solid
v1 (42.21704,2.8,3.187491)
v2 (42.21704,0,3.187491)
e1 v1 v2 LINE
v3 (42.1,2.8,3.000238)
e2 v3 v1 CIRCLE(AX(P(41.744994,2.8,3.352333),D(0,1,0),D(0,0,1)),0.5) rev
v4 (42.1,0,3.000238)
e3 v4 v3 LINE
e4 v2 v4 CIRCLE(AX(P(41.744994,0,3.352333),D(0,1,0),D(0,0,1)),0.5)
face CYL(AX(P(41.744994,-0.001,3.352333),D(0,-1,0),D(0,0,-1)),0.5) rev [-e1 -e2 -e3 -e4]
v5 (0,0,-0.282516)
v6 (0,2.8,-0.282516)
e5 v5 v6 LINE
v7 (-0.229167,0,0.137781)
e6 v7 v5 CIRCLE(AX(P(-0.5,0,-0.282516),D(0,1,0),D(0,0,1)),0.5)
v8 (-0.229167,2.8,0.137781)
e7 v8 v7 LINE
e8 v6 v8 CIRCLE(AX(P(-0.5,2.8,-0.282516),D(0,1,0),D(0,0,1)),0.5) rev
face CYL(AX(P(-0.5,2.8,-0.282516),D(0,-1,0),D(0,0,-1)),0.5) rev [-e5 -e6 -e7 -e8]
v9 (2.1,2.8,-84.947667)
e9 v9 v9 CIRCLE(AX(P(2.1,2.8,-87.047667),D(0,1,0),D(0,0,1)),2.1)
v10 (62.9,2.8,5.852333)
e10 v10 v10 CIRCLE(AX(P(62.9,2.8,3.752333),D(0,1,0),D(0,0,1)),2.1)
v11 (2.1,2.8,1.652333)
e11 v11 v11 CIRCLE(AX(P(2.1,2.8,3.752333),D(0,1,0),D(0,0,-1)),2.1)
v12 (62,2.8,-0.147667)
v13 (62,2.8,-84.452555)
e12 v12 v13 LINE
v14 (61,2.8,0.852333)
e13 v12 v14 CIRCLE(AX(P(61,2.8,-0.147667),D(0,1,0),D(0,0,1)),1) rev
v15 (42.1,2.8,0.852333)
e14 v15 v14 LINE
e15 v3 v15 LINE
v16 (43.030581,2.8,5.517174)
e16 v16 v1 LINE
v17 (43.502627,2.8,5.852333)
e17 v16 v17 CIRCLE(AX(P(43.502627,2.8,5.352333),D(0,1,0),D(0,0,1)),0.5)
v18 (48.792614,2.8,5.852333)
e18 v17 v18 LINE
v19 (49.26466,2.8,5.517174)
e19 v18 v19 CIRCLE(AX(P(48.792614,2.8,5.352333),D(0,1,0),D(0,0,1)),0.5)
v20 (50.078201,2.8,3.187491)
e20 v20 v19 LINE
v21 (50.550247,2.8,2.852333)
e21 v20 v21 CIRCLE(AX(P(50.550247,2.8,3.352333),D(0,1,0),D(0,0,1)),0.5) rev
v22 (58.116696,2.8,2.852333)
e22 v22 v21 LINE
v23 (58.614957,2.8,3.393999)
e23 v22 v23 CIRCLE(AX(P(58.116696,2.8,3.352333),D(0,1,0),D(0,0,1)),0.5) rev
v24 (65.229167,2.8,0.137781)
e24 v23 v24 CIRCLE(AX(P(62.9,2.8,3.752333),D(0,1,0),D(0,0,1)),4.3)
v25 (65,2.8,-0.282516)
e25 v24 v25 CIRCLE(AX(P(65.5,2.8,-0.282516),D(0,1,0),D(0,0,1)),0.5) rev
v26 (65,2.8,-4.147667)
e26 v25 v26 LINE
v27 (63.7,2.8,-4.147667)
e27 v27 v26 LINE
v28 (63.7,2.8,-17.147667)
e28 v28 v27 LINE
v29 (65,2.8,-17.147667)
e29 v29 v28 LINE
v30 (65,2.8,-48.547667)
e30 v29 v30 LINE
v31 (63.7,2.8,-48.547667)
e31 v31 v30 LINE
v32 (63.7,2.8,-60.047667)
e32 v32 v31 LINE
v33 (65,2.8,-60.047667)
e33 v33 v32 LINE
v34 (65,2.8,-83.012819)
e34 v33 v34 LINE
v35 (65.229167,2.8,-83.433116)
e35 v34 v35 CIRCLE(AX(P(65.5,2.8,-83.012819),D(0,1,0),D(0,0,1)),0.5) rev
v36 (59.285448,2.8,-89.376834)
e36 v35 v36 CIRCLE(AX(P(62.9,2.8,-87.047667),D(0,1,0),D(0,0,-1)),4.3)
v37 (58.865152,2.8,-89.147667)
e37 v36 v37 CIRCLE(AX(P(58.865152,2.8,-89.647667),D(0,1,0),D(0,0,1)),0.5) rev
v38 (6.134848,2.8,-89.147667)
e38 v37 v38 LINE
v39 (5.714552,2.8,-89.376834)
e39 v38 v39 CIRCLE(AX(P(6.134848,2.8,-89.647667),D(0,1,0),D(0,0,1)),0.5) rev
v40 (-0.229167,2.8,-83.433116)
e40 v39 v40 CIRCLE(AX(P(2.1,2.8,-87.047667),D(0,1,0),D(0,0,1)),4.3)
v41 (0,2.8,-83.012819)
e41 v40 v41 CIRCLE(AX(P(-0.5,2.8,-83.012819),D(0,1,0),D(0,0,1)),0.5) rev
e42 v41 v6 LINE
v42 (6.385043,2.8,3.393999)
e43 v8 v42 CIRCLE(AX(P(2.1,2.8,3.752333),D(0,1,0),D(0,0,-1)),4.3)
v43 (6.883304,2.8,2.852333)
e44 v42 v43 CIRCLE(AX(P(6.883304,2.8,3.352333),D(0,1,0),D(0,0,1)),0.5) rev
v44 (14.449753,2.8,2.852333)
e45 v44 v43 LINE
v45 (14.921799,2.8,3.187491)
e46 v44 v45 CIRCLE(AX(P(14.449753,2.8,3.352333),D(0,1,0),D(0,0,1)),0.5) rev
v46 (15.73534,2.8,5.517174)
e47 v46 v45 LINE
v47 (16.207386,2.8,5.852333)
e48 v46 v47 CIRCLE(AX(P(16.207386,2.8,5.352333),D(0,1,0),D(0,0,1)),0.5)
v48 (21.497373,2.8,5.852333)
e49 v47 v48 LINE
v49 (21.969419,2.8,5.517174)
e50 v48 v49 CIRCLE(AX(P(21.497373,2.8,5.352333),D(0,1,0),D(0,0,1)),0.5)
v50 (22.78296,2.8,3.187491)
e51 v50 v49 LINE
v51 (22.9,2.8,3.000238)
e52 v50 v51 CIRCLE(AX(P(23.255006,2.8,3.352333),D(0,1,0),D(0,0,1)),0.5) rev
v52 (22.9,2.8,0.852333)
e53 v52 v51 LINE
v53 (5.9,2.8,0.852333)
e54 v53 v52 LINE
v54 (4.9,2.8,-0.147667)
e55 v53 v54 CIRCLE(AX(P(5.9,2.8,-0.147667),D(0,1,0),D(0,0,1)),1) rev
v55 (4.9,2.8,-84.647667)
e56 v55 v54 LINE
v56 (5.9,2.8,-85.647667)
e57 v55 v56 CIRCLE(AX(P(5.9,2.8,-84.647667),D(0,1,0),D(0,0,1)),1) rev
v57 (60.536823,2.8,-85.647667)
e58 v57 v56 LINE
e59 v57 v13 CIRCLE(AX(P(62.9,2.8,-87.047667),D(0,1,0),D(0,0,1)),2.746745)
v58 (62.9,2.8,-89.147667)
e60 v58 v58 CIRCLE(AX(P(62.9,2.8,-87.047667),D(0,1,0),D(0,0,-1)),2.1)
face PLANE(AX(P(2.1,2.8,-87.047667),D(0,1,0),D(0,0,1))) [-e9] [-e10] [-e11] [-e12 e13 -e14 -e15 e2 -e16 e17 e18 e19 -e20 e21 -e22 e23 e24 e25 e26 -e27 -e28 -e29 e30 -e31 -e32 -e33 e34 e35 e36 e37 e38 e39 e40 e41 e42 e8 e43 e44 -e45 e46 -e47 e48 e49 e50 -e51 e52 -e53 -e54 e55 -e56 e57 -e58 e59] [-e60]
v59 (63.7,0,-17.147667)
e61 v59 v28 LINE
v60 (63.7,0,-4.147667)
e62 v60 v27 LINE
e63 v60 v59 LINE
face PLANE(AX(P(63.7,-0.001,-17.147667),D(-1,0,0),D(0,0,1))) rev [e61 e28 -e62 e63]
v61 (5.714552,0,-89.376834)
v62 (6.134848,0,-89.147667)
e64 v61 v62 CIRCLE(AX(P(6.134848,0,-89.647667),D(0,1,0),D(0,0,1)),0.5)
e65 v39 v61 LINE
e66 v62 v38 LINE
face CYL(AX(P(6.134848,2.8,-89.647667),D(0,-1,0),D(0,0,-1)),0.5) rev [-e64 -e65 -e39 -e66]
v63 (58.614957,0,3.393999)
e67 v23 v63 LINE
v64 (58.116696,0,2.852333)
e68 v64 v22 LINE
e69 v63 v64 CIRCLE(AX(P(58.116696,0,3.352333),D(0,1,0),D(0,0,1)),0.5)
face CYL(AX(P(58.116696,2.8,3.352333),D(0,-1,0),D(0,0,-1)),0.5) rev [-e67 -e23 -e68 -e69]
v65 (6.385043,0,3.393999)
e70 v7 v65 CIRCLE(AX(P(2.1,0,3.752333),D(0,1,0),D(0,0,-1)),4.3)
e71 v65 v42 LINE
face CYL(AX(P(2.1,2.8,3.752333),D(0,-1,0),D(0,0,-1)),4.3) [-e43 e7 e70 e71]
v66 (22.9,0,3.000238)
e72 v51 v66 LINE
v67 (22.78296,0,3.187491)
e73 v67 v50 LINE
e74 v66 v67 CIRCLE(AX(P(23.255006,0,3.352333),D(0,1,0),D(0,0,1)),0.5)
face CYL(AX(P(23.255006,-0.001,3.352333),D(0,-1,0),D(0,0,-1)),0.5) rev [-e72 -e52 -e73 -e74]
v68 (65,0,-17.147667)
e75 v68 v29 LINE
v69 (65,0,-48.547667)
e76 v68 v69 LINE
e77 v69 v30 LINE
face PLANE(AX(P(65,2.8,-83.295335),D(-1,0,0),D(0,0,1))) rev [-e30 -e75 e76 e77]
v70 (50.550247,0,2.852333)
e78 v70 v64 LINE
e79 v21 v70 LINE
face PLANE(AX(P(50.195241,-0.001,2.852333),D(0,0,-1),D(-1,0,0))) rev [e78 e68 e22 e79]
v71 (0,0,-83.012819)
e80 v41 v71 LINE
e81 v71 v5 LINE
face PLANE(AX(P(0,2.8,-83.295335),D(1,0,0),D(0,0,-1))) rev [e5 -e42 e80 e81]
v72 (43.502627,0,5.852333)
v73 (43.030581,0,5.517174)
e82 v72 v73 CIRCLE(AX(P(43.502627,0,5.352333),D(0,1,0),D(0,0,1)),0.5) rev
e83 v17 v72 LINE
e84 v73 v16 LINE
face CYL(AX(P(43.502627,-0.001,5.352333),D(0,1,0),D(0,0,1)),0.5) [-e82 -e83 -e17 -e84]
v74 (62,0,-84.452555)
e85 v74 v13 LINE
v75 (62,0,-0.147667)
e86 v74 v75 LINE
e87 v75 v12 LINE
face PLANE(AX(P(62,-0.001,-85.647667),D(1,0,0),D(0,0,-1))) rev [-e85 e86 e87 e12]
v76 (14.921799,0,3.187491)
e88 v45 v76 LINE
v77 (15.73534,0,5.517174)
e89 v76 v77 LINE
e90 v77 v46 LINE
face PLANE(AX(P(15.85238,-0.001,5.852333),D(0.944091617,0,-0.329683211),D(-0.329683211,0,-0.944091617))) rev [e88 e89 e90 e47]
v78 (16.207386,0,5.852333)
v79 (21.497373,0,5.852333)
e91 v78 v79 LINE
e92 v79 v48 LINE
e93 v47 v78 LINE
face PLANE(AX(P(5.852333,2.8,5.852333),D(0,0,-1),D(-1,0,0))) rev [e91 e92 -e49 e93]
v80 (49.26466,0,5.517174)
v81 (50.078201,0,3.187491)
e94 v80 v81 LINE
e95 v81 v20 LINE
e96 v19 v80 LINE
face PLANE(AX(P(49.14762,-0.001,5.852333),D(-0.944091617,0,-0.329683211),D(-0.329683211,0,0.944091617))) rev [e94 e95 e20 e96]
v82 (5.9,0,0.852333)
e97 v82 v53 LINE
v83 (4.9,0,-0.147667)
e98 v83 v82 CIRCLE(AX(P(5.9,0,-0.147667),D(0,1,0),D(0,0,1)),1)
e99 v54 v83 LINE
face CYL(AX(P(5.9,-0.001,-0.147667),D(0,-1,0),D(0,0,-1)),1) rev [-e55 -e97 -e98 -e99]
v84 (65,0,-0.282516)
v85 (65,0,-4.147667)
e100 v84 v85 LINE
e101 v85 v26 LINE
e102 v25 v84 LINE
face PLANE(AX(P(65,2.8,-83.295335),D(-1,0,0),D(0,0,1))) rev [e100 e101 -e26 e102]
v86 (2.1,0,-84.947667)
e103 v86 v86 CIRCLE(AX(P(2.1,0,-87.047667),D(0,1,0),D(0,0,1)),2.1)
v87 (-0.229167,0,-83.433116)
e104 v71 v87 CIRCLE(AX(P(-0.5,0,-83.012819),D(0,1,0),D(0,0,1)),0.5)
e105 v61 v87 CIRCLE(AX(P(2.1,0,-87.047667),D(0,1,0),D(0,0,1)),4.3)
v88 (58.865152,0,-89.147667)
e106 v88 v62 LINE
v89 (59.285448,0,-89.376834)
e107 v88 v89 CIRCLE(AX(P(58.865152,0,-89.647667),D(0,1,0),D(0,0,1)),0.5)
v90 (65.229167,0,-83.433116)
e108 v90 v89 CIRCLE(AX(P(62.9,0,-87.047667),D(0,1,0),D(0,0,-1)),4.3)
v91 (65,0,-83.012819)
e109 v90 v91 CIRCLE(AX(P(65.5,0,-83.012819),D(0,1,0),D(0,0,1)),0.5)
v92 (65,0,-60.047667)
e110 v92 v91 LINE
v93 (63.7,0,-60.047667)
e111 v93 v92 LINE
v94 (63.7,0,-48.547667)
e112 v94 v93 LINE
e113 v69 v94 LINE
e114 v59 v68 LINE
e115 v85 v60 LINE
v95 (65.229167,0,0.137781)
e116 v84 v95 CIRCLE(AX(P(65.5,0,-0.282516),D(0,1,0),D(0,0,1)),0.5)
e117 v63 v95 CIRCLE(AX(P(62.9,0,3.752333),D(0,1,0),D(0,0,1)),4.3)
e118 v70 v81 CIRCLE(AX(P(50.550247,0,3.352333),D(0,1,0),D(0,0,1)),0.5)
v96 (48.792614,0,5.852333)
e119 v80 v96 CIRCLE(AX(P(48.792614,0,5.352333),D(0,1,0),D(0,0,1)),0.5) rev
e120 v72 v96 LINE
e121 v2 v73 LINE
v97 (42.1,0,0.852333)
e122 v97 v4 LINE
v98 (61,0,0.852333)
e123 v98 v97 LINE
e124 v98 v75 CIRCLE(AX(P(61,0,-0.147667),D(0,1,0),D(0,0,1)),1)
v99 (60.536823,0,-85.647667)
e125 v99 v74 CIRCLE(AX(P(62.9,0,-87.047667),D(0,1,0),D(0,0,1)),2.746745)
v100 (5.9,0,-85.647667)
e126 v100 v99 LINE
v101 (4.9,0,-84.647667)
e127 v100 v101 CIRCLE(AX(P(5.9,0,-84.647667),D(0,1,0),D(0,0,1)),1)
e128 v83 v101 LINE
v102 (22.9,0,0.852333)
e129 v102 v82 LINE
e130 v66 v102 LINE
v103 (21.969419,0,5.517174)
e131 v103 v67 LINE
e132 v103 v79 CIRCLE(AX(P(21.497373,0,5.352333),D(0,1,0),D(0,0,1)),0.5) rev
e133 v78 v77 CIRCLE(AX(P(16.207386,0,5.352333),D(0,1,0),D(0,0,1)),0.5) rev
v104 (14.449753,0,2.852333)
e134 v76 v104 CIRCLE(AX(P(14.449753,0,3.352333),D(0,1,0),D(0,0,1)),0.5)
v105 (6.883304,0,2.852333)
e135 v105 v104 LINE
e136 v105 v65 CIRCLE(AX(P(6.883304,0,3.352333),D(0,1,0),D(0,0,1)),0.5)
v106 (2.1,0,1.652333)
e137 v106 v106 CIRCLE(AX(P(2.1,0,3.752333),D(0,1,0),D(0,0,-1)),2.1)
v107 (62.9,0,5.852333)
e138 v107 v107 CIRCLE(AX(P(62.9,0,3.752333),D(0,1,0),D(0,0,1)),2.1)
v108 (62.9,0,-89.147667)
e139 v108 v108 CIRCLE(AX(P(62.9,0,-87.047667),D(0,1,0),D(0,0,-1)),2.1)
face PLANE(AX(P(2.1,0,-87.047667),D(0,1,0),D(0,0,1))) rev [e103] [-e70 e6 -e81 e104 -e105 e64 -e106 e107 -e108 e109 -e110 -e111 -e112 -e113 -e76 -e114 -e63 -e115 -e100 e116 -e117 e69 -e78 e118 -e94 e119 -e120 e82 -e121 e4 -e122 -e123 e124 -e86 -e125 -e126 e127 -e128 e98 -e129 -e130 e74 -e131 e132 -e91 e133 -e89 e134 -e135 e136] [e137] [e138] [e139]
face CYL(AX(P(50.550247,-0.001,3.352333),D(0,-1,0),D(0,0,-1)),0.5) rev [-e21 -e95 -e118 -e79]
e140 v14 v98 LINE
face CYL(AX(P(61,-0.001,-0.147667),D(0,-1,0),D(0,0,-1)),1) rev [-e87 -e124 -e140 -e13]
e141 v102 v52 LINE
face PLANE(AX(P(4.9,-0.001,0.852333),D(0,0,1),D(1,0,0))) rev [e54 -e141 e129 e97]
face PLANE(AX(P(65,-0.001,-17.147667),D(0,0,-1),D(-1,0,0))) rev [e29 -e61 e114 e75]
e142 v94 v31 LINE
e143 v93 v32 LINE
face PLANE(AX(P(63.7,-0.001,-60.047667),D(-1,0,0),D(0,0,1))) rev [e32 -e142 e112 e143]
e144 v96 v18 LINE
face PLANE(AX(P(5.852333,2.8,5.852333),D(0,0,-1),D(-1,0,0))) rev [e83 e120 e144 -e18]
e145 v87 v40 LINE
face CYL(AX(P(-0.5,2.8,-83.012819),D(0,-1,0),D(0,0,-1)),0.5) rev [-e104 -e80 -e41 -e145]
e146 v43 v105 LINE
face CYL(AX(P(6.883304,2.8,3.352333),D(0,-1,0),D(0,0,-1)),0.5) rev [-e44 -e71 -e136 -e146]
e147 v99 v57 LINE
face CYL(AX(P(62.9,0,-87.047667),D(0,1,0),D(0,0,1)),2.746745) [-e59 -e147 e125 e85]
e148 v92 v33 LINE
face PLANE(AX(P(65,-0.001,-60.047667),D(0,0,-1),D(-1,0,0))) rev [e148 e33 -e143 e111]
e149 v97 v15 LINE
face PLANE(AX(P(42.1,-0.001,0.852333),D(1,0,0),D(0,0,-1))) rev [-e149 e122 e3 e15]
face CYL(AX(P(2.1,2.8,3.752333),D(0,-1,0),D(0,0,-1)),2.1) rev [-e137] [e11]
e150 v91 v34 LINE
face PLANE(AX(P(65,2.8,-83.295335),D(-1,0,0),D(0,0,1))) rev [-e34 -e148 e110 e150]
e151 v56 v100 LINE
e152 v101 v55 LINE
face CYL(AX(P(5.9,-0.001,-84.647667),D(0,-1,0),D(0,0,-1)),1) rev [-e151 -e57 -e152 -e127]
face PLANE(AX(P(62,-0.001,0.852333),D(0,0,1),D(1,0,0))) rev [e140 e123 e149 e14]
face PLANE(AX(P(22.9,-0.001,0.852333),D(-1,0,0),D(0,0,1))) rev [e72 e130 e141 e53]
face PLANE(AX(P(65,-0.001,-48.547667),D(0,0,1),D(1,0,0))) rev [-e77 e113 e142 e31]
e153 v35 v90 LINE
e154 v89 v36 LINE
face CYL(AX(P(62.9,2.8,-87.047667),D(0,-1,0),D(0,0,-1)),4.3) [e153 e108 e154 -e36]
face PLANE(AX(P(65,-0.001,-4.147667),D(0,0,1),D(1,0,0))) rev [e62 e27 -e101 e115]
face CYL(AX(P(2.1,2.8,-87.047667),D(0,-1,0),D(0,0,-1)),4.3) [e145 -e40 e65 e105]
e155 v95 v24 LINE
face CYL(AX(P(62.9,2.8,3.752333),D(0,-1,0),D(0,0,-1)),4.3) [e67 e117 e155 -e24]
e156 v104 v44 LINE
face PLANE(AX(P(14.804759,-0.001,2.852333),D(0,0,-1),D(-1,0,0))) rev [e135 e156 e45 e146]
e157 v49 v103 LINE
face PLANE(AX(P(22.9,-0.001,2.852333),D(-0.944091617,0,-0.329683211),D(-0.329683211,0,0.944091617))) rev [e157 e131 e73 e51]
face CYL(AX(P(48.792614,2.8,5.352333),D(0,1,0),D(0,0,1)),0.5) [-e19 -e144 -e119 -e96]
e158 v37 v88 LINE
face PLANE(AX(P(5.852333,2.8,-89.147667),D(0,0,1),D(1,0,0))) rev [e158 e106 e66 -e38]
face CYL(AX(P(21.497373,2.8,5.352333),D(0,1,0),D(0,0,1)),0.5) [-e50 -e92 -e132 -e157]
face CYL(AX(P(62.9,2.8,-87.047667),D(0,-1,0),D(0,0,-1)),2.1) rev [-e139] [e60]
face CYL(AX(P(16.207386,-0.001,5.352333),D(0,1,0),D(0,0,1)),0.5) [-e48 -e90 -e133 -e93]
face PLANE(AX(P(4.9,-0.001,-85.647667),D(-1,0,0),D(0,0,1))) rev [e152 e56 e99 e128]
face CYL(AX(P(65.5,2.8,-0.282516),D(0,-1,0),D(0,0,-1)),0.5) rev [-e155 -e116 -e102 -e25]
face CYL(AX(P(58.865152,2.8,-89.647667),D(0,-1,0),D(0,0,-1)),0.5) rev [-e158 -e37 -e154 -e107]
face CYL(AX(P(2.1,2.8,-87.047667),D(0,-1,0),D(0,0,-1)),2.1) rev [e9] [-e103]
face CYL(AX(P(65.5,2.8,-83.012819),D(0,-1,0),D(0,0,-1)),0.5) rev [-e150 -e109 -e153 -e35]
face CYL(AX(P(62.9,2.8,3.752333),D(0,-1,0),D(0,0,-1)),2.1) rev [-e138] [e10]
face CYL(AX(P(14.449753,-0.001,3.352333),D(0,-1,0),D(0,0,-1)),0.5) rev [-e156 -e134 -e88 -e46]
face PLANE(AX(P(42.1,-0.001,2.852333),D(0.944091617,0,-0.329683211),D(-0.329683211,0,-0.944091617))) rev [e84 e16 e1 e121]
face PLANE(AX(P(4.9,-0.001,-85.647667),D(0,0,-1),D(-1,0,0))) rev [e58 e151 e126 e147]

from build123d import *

# Parameters (mm, degrees)
BASEPLATE_OUTLINE_R = 2.1
BASEPLATE_DEPTH     = 2.8
CUT_EXTRUDE1_REACH  = 115.438
FILLET1_R           = 1
CUT_EXTRUDE2_REACH  = 115.438
SKETCH4_W           = 1.3
SKETCH4_H           = 11.5
SKETCH4_H_2         = 13
BOSS_EXTRUDE1_START = -2.8
BOSS_EXTRUDE1_DEPTH = 2.8


# Read off the part's stored shape, not the designer's step: BasePlate
with BuildPart() as part:
    # BasePlate outline → BasePlate (new body)
    with BuildSketch(Plane(origin=(0, 0, 0), x_dir=(1, 0, 0), z_dir=(0, 1, 0))):
        with BuildLine():
            Line((43.502626614, -5.852332608), (48.792614178, -5.852332608))
            ThreePointArc((48.792614178, -5.852332608), (49.082078508, -5.760021707), (49.264659986, -5.517174213))
            Line((49.264659986, -5.517174213), (50.078201202, -3.187491002))
            ThreePointArc((50.078201202, -3.187491002), (50.26078268, -2.944643509), (50.55024701, -2.852332608))
            Line((50.55024701, -2.852332608), (58.116695703, -2.852332608))
            ThreePointArc((58.116695703, -2.852332608), (58.484685739, -3.013831008), (58.614956567, -3.393999275))
            ThreePointArc((58.614956567, -3.393999275), (64.799237397, -7.61016844), (65.229166667, -0.137781095))
            ThreePointArc((65.229166667, -0.137781095), (65.061014427, 0.043158816), (65, 0.282515593))
            Line((65, 0.282515593), (65, 83.012819192))
            ThreePointArc((65, 83.012819192), (65.061014427, 83.252175969), (65.229166667, 83.433115879))
            ThreePointArc((65.229166667, 83.433115879), (65.940559159, 90.088226551), (59.285448487, 89.376834059))
            ThreePointArc((59.285448487, 89.376834059), (59.104508577, 89.208681819), (58.8651518, 89.147667392))
            Line((58.8651518, 89.147667392), (6.1348482, 89.147667392))
            ThreePointArc((6.1348482, 89.147667392), (5.895491423, 89.208681819), (5.714551513, 89.376834059))
            ThreePointArc((5.714551513, 89.376834059), (-0.940559159, 90.088226551), (-0.229166667, 83.433115879))
            ThreePointArc((-0.229166667, 83.433115879), (-0.061014427, 83.252175969), (0, 83.012819192))
            Line((0, 83.012819192), (0, 0.282515593))
            ThreePointArc((0, 0.282515593), (-0.061014427, 0.043158816), (-0.229166667, -0.137781095))
            ThreePointArc((-0.229166667, -0.137781095), (0.200762603, -7.61016844), (6.385043433, -3.393999275))
            ThreePointArc((6.385043433, -3.393999275), (6.515314261, -3.013831008), (6.883304297, -2.852332608))
            Line((6.883304297, -2.852332608), (14.44975299, -2.852332608))
            ThreePointArc((14.44975299, -2.852332608), (14.73921732, -2.944643509), (14.921798798, -3.187491002))
            Line((14.921798798, -3.187491002), (15.735340014, -5.517174213))
            ThreePointArc((15.735340014, -5.517174213), (15.917921492, -5.760021707), (16.207385822, -5.852332608))
            Line((16.207385822, -5.852332608), (21.497373386, -5.852332608))
            ThreePointArc((21.497373386, -5.852332608), (21.786837716, -5.760021707), (21.969419194, -5.517174213))
            Line((21.969419194, -5.517174213), (22.78296041, -3.187491002))
            ThreePointArc((22.78296041, -3.187491002), (22.965541888, -2.944643509), (23.255006218, -2.852332608))
            Line((23.255006218, -2.852332608), (41.744993782, -2.852332608))
            ThreePointArc((41.744993782, -2.852332608), (42.034458112, -2.944643509), (42.21703959, -3.187491002))
            Line((42.21703959, -3.187491002), (43.030580806, -5.517174213))
            ThreePointArc((43.030580806, -5.517174213), (43.213162284, -5.760021707), (43.502626614, -5.852332608))
        make_face()
        with Locations((2.1, -3.752332608)):
            Circle(BASEPLATE_OUTLINE_R, mode=Mode.SUBTRACT)
        with Locations((62.9, -3.752332608)):
            Circle(BASEPLATE_OUTLINE_R, mode=Mode.SUBTRACT)
        with Locations((2.1, 87.047667392)):
            Circle(BASEPLATE_OUTLINE_R, mode=Mode.SUBTRACT)
        with Locations((62.9, 87.047667392)):
            Circle(BASEPLATE_OUTLINE_R, mode=Mode.SUBTRACT)
    extrude(amount=BASEPLATE_DEPTH)

    # Sketch3 → Cut-Extrude1 (cut, up to next)
    with BuildSketch(Plane(origin=(0, 2.8, 0), x_dir=(1, 0, 0), z_dir=(0, 1, 0)), mode=Mode.PRIVATE) as cut_extrude1_sk1:
        Polygon((4.9, 85.647667392), (4.9, -0.852332608), (22.9, -0.852332608), (22.9, -3.00023804), (42.1, -3.00023804), (42.1, -0.852332608), (62, -0.852332608), (62, 85.647667392), align=None)
    cut_extrude1_tool1 = extrude(cut_extrude1_sk1.sketch, amount=-CUT_EXTRUDE1_REACH, mode=Mode.PRIVATE) & part.part
    add(cut_extrude1_tool1.solids().sort_by_distance((33.442134, 2.8, -42.030646))[0], mode=Mode.SUBTRACT)

    # Fillet1
    fillet1_edges = [part.edges().sort_by_distance(p)[0] for p in [
        (4.9, 1.4, -85.647667392),
        (62, 1.4, 0.852332608),
        (4.9, 1.4, 0.852332608),
    ]]
    fillet(fillet1_edges, radius=FILLET1_R)

    # Sketch4 → Cut-Extrude2 (cut, up to next)
    with BuildSketch(Plane(origin=(0, 2.8, 0), x_dir=(1, 0, 0), z_dir=(0, 1, 0)), mode=Mode.PRIVATE) as cut_extrude2_sk1:
        with Locations((64.35, 54.297667392)):
            Rectangle(SKETCH4_W, SKETCH4_H)
    cut_extrude2_tool1 = extrude(cut_extrude2_sk1.sketch, amount=-CUT_EXTRUDE2_REACH, mode=Mode.PRIVATE) & part.part
    # Sketch4 → Cut-Extrude2 (cut, up to next)
    with BuildSketch(Plane(origin=(0, 2.8, 0), x_dir=(1, 0, 0), z_dir=(0, 1, 0)), mode=Mode.PRIVATE) as cut_extrude2_sk2:
        with Locations((64.35, 10.647667392)):
            Rectangle(SKETCH4_W, SKETCH4_H_2)
    cut_extrude2_tool2 = extrude(cut_extrude2_sk2.sketch, amount=-CUT_EXTRUDE2_REACH, mode=Mode.PRIVATE) & part.part
    add(cut_extrude2_tool1.solids().sort_by_distance((64.35, 2.8, -54.297667))[0], mode=Mode.SUBTRACT)
    add(cut_extrude2_tool2.solids().sort_by_distance((64.35, 2.8, -10.647667))[0], mode=Mode.SUBTRACT)

    # Sketch5 → Boss-Extrude1 (add)
    with BuildSketch(Plane(origin=(0, 2.8, 0), x_dir=(1, 0, 0), z_dir=(0, 1, 0)).offset(BOSS_EXTRUDE1_START)):
        with BuildLine():
            Line((61.334752416, 85.647667392), (60.536822695, 85.647667392))
            ThreePointArc((60.536822695, 85.647667392), (61.162428481, 84.920356368), (62, 84.45255526))
            Line((62, 84.45255526), (62, 85.150300796))
            ThreePointArc((62, 85.150300796), (61.64254034, 85.365765134), (61.334752416, 85.647667392))
        make_face()
    extrude(amount=BOSS_EXTRUDE1_DEPTH)


solid = part.part
